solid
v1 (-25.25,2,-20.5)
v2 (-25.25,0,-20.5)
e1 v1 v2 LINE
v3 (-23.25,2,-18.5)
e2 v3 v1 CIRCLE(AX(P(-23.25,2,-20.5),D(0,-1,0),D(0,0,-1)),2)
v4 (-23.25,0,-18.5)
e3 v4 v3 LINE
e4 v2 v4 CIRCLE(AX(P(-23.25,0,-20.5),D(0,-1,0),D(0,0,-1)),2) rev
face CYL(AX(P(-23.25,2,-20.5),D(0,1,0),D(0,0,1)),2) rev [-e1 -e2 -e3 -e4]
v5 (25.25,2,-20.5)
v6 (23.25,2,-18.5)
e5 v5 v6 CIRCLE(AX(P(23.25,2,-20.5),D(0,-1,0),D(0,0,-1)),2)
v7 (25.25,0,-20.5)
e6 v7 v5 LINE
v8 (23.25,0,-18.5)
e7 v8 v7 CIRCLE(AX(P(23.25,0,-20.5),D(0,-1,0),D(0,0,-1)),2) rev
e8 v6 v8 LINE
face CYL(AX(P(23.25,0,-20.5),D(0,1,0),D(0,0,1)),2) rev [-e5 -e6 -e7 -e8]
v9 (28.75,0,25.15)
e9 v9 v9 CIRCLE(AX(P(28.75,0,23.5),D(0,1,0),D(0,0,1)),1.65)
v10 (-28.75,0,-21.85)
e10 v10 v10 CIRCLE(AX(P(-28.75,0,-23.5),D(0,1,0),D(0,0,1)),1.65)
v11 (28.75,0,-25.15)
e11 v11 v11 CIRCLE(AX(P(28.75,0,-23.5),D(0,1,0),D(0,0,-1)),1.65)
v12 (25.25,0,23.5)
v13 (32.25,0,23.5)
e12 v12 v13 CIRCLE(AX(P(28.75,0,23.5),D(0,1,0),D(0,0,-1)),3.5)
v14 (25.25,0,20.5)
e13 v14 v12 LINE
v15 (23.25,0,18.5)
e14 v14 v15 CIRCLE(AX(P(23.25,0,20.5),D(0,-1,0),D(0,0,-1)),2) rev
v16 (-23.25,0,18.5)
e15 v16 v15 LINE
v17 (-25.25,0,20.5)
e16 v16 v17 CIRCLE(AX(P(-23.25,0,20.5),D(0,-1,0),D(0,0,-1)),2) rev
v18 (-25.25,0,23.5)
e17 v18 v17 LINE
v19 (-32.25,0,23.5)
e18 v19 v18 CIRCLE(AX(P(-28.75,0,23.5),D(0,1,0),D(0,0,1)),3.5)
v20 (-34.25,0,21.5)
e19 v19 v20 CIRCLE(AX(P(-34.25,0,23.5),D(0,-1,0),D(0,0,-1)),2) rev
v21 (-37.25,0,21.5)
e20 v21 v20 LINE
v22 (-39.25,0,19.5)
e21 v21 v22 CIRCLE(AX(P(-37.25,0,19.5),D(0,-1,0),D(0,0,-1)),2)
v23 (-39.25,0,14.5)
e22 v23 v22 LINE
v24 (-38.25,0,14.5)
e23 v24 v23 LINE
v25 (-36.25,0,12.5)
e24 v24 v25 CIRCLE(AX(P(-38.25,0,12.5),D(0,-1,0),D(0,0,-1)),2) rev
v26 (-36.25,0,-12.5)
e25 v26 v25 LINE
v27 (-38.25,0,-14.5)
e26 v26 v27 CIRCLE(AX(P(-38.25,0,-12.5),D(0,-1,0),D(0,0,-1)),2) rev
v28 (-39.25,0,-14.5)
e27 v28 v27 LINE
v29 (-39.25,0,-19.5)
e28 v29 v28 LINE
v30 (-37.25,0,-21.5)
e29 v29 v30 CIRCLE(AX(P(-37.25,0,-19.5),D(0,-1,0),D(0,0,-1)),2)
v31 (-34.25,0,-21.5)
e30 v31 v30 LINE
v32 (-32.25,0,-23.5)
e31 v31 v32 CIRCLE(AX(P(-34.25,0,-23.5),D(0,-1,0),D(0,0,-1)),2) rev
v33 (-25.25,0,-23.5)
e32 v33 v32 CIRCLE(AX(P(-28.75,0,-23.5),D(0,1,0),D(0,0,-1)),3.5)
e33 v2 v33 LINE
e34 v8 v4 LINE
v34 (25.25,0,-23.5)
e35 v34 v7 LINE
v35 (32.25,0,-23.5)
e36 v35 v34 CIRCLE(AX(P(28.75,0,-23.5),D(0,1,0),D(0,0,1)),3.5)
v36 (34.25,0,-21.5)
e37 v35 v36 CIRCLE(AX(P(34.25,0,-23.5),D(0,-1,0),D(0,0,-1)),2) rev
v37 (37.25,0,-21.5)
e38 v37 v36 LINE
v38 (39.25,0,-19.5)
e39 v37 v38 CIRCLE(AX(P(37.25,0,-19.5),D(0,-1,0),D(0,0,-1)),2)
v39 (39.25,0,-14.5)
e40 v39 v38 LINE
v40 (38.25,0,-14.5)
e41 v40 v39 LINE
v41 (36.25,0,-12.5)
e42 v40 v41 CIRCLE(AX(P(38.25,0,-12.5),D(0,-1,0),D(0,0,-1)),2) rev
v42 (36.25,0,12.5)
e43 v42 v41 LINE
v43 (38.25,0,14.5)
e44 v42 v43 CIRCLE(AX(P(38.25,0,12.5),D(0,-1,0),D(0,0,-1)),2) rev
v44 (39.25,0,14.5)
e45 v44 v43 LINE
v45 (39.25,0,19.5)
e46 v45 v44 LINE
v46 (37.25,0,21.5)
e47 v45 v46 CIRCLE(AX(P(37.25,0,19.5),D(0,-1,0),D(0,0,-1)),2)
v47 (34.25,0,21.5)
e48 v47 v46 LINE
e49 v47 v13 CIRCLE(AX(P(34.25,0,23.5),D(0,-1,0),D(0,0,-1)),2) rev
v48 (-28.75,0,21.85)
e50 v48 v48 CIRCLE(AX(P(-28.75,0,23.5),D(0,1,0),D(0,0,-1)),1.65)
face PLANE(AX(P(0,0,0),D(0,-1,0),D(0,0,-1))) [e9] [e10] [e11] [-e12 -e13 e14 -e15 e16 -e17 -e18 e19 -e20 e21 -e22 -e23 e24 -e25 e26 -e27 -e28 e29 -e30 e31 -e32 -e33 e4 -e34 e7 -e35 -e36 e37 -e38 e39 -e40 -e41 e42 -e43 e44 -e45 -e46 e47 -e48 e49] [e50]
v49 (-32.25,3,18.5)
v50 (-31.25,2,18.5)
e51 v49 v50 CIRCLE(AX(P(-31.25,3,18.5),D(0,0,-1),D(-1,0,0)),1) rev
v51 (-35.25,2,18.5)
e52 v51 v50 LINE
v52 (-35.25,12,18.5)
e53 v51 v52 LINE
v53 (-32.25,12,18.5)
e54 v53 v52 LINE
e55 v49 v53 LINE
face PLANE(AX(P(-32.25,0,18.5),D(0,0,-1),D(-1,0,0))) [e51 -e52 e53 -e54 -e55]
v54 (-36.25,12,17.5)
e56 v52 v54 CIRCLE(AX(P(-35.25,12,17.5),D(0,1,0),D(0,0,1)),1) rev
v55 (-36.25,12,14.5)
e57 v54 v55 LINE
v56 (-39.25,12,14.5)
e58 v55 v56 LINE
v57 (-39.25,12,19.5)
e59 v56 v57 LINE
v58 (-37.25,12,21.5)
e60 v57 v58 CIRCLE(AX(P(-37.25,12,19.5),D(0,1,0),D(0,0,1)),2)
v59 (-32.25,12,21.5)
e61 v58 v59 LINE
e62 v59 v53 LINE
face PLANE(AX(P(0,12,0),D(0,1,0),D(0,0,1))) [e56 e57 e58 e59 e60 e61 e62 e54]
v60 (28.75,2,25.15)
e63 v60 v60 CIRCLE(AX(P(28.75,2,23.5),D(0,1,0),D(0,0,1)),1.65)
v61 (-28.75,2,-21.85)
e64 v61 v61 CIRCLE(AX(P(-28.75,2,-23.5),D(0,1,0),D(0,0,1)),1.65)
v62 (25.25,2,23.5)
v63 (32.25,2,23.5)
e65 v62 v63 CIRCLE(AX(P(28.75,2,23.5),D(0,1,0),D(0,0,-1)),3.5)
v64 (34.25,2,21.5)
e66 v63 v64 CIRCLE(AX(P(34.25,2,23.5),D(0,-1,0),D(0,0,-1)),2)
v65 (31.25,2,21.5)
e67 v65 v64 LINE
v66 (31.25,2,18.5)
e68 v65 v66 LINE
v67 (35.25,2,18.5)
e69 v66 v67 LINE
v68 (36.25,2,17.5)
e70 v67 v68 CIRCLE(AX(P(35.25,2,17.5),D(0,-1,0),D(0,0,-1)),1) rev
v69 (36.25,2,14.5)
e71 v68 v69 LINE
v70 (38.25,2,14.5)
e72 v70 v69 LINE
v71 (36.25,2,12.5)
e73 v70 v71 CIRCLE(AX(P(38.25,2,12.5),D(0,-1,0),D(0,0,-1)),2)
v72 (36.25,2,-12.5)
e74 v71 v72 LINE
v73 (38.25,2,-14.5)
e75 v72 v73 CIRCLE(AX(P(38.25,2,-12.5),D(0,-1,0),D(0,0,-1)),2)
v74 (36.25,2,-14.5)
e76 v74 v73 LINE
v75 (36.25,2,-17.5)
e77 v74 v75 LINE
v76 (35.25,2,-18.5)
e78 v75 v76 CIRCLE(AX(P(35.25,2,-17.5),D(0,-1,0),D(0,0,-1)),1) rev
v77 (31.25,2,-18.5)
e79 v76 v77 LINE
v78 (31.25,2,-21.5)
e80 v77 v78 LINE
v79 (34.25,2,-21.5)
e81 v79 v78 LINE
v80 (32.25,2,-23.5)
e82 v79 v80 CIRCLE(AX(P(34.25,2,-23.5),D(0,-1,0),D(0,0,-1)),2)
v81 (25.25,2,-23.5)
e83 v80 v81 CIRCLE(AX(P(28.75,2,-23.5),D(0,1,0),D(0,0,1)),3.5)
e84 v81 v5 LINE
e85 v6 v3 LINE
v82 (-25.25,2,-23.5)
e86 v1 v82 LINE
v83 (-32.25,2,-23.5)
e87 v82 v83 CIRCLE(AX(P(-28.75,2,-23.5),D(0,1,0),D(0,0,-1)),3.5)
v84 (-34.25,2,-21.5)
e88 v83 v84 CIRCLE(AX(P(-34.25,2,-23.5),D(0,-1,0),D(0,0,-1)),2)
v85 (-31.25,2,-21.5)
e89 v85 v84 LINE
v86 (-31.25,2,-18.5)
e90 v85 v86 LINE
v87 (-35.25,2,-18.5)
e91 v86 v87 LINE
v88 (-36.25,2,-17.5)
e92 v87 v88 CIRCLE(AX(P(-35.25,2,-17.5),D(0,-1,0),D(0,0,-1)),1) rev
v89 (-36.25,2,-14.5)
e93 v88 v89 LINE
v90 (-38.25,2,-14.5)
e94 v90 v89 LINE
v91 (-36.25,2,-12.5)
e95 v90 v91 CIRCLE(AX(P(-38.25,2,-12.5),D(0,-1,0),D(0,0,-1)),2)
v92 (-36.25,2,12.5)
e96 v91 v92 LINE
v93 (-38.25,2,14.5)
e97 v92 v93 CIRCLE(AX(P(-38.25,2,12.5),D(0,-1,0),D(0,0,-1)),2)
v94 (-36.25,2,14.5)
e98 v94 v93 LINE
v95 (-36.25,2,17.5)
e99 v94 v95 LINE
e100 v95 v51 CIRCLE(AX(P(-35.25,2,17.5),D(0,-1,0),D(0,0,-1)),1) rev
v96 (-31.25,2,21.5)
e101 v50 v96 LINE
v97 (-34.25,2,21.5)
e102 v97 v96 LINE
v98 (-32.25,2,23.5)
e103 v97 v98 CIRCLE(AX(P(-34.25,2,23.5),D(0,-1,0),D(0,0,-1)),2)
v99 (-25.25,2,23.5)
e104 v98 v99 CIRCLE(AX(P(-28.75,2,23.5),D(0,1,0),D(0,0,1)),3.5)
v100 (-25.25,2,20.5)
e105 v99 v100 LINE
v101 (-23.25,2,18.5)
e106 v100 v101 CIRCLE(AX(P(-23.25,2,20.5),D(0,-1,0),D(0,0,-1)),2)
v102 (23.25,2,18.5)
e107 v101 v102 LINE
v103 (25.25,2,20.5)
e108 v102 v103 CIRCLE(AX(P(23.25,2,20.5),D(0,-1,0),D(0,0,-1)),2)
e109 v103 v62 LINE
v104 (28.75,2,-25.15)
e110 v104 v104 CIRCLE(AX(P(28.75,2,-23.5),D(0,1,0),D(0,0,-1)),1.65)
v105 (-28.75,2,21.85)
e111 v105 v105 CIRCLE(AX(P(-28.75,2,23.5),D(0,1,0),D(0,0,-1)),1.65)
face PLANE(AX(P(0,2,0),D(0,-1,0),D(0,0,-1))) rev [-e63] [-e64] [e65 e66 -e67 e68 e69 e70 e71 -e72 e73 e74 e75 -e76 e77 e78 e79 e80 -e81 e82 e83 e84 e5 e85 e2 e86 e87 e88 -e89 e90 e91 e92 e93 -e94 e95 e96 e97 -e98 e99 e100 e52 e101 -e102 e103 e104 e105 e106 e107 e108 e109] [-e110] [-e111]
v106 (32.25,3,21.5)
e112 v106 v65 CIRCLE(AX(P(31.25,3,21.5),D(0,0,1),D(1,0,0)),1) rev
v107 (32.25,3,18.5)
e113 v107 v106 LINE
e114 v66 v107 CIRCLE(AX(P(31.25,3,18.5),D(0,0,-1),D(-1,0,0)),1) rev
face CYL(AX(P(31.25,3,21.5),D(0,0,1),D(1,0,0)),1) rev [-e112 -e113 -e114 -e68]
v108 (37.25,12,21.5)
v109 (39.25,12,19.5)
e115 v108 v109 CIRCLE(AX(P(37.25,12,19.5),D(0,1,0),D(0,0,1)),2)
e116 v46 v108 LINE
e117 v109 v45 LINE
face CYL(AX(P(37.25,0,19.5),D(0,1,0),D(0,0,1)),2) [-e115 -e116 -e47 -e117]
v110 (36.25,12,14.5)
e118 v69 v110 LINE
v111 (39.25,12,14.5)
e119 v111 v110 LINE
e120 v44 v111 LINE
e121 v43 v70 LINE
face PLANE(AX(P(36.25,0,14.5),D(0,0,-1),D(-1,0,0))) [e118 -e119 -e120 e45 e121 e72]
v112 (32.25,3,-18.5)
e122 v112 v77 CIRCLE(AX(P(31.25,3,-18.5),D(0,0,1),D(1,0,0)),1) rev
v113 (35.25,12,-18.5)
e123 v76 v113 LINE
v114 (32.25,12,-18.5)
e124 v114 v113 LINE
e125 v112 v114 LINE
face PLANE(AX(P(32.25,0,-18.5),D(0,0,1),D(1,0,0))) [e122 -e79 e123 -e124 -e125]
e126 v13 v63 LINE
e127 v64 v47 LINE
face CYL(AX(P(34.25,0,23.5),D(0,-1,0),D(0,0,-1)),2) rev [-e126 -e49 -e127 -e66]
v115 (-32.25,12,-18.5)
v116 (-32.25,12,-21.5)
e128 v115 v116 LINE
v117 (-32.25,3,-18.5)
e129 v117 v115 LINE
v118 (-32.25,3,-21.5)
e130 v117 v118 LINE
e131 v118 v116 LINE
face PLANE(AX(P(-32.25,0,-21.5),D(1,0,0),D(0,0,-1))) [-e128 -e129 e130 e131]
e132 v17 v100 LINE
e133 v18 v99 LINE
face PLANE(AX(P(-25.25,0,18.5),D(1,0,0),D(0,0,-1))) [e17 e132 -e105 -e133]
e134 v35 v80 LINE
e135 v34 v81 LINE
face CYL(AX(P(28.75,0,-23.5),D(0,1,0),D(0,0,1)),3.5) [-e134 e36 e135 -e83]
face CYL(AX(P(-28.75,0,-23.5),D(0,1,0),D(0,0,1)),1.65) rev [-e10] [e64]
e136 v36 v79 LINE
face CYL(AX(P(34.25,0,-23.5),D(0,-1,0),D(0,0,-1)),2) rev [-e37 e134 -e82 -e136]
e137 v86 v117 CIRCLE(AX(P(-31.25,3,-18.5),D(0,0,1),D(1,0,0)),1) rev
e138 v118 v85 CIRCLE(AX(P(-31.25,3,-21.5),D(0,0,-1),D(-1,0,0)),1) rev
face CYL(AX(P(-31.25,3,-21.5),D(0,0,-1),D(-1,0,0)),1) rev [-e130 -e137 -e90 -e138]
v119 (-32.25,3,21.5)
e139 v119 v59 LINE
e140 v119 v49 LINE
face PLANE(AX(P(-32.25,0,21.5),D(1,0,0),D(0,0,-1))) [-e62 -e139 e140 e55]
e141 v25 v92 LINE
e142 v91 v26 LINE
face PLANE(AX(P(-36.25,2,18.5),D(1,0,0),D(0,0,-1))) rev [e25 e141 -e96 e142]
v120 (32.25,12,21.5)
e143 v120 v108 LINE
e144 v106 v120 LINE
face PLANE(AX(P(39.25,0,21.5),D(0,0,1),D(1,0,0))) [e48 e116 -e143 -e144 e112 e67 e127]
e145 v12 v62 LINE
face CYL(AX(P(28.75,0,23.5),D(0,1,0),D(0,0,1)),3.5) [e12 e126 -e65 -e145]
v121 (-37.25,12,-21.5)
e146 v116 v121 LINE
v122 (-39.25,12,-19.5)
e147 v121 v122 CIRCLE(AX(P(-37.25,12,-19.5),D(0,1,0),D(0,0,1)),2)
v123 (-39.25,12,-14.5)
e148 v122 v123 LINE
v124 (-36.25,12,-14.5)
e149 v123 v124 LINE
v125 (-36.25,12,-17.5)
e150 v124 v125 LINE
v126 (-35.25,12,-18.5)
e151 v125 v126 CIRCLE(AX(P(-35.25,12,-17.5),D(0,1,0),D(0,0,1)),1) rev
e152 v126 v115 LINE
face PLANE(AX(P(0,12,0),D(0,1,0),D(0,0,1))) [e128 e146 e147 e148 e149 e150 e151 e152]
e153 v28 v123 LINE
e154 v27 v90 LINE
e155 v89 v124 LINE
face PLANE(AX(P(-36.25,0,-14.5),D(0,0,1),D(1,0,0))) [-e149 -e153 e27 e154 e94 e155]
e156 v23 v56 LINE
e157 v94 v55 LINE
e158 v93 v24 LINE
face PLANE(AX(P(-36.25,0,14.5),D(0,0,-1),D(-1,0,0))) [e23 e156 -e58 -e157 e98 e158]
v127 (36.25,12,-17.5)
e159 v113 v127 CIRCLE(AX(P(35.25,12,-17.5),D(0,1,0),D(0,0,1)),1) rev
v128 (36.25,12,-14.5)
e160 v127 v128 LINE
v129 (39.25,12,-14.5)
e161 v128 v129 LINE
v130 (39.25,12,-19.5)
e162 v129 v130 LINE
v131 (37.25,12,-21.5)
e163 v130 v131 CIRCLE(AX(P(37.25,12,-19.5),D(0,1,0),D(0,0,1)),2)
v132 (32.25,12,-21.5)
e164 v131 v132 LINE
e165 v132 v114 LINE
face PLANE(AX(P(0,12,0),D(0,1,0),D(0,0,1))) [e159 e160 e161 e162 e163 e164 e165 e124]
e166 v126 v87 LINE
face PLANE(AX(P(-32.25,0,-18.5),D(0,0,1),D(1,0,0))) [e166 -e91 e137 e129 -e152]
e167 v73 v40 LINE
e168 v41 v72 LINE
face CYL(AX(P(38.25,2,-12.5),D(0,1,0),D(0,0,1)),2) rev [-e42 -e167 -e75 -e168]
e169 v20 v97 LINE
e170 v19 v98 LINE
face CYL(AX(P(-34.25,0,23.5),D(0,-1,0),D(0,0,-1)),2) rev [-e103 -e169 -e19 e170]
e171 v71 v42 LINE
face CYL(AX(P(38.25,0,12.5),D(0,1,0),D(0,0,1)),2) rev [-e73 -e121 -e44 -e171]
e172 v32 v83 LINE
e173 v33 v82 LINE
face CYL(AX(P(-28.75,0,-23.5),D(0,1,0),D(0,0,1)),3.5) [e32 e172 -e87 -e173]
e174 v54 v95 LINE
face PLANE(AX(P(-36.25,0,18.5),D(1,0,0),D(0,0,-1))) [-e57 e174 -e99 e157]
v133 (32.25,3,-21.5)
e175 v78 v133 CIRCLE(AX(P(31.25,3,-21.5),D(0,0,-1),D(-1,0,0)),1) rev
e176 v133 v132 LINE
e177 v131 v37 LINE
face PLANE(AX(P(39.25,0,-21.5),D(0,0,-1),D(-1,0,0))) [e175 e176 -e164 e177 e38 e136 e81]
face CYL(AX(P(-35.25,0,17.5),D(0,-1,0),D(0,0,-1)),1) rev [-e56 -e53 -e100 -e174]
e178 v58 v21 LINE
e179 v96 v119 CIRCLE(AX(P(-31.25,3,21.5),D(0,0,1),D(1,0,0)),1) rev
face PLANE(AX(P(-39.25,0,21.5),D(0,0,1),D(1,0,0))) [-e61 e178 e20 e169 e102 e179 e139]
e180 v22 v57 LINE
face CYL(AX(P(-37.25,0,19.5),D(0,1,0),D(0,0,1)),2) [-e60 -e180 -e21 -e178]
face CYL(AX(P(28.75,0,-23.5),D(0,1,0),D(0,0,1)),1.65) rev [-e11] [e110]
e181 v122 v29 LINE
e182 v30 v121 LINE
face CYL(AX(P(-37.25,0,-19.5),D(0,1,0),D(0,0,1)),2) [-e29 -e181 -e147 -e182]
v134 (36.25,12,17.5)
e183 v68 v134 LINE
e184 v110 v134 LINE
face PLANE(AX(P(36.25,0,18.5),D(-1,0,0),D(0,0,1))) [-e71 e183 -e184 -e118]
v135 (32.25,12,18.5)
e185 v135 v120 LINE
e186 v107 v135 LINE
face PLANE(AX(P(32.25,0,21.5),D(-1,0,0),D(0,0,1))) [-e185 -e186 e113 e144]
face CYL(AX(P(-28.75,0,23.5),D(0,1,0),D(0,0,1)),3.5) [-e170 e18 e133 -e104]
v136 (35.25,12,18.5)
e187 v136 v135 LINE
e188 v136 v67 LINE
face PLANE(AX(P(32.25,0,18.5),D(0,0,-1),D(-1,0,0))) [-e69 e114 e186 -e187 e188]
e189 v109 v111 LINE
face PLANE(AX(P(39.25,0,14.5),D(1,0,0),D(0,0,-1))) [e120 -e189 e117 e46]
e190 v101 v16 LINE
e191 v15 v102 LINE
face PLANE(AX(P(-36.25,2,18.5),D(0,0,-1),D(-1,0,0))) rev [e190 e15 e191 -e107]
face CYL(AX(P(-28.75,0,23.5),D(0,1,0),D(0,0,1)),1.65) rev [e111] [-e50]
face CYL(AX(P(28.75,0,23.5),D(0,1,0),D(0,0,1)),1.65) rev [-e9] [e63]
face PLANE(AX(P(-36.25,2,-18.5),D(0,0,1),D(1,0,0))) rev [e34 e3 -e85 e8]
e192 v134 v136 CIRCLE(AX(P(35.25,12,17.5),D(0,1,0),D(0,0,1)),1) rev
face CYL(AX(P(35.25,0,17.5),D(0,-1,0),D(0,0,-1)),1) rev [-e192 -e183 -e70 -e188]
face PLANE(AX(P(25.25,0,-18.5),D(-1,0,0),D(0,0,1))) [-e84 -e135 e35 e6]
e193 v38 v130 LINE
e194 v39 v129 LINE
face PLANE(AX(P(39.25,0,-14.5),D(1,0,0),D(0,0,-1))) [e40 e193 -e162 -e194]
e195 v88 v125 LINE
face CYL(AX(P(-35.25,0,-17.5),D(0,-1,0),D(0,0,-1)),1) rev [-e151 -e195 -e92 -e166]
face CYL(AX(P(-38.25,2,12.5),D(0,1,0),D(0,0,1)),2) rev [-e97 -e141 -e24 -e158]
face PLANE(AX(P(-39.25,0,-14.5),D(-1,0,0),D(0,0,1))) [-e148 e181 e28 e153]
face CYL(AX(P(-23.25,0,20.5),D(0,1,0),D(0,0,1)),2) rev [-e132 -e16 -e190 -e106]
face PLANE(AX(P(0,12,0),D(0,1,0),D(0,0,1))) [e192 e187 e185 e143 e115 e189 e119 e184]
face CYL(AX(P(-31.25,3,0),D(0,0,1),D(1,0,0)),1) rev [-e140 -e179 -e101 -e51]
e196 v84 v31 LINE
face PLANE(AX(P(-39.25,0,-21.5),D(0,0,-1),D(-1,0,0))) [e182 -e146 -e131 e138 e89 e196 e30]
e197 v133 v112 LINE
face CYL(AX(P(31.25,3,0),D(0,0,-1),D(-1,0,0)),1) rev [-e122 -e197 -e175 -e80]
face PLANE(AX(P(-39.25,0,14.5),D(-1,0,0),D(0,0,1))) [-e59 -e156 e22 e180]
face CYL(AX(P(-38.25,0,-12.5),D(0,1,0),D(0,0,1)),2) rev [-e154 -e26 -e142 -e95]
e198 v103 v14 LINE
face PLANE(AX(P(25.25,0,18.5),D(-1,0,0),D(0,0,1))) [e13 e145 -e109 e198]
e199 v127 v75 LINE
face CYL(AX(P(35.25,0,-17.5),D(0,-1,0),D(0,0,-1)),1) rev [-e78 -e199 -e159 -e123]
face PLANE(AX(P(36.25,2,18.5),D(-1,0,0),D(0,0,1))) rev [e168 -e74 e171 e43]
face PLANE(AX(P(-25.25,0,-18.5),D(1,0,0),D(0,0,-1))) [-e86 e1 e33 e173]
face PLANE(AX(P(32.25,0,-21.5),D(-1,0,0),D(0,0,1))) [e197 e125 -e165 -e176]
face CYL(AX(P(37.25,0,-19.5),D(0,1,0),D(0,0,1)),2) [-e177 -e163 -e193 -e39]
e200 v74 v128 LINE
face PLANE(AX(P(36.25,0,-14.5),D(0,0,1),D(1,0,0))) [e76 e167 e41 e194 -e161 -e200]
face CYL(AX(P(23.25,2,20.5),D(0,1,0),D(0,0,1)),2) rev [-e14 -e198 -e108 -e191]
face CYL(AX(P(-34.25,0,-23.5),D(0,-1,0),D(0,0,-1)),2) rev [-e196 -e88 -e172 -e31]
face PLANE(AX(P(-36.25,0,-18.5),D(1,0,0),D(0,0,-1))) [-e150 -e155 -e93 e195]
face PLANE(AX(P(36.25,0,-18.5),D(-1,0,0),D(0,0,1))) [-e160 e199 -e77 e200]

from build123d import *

# Parameters (mm, degrees)
SKETCH_1_W           = 72.5
SKETCH_1_H           = 37
EXTRUDE_1_DEPTH      = 2
EXTRUDE_2_DEPTH      = 10
EXTRUDE_2_DEPTH_BACK = 2
SKETCH_3_R           = 1.65
EXTRUDE_3_DEPTH      = 2
FILLET_1_R           = 2
FILLET_2_R           = 1


with BuildPart() as part:
    # 草图1 → 凸台-拉伸1 (new body)
    with BuildSketch(Plane(origin=(0, 0, 0), x_dir=(1, 0, 0), z_dir=(0, 1, 0))):
        Rectangle(SKETCH_1_W, SKETCH_1_H)
    extrude(amount=EXTRUDE_1_DEPTH)

    # 草图2 → 凸台-拉伸2 (add, two sides: drawn at the far end of the back side and taken through both)
    with BuildSketch(Plane(origin=(0, 2, 0), x_dir=(1, 0, 0), z_dir=(0, 1, 0)).offset(-EXTRUDE_2_DEPTH_BACK)):
        Polygon((-36.25, 18.5), (-36.25, 14.5), (-39.25, 14.5), (-39.25, 21.5), (-32.25, 21.5), (-32.25, 18.5), align=None)
        Polygon((32.25, 18.5), (36.25, 18.5), (36.25, 14.5), (39.25, 14.5), (39.25, 21.5), (32.25, 21.5), align=None)
        Polygon((36.25, -18.5), (36.25, -14.5), (39.25, -14.5), (39.25, -21.5), (32.25, -21.5), (32.25, -18.5), align=None)
        Polygon((-32.25, -18.5), (-36.25, -18.5), (-36.25, -14.5), (-39.25, -14.5), (-39.25, -21.5), (-32.25, -21.5), align=None)
    extrude(amount=EXTRUDE_2_DEPTH + EXTRUDE_2_DEPTH_BACK)

    # 草图3 → 凸台-拉伸3 (add)
    # profile 1 of 4: a face of its own
    with BuildSketch(Plane(origin=(0, 2, 0), x_dir=(1, 0, 0), z_dir=(0, 1, 0))):
        with BuildLine():
            Line((25.25, 18.5), (25.25, 23.5))
            ThreePointArc((25.25, 23.5), (28.75, 27), (32.25, 23.5))
            Line((32.25, 23.5), (32.25, 18.5))
            Line((32.25, 18.5), (25.25, 18.5))
        make_face()
        with Locations(Location((28.75, 23.5, 0), (0, 0, 90))):
            Circle(SKETCH_3_R, mode=Mode.SUBTRACT)
    # profile 2 of 4: a face of its own
    with BuildSketch(Plane(origin=(0, 2, 0), x_dir=(1, 0, 0), z_dir=(0, 1, 0))):
        with BuildLine():
            Line((-32.25, 18.5), (-25.25, 18.5))
            Line((-25.25, 18.5), (-25.25, 23.5))
            ThreePointArc((-25.25, 23.5), (-28.75, 27), (-32.25, 23.5))
            Line((-32.25, 23.5), (-32.25, 18.5))
        make_face()
        with Locations(Location((-28.75, 23.5, 0), (0, 0, 270))):
            Circle(SKETCH_3_R, mode=Mode.SUBTRACT)
    # profile 3 of 4: a face of its own
    with BuildSketch(Plane(origin=(0, 2, 0), x_dir=(1, 0, 0), z_dir=(0, 1, 0))):
        with BuildLine():
            Line((32.25, -18.5), (25.25, -18.5))
            Line((25.25, -18.5), (25.25, -23.5))
            ThreePointArc((25.25, -23.5), (28.75, -27), (32.25, -23.5))
            Line((32.25, -23.5), (32.25, -18.5))
        make_face()
        with Locations(Location((28.75, -23.5, 0), (0, 0, 270))):
            Circle(SKETCH_3_R, mode=Mode.SUBTRACT)
    # profile 4 of 4: a face of its own
    with BuildSketch(Plane(origin=(0, 2, 0), x_dir=(1, 0, 0), z_dir=(0, 1, 0))):
        with BuildLine():
            Line((-25.25, -18.5), (-25.25, -23.5))
            ThreePointArc((-25.25, -23.5), (-28.75, -27), (-32.25, -23.5))
            Line((-32.25, -23.5), (-32.25, -18.5))
            Line((-32.25, -18.5), (-25.25, -18.5))
        make_face()
        with Locations(Location((-28.75, -23.5, 0), (0, 0, 90))):
            Circle(SKETCH_3_R, mode=Mode.SUBTRACT)
    extrude(amount=-EXTRUDE_3_DEPTH)

    # 圆角1
    fillet_1_edges = [part.edges().sort_by_distance(p)[0] for p in [
        (-25.25, 1, 18.5),
        (-36.25, 1, 14.5),
        (-36.25, 1, -14.5),
        (-25.25, 1, -18.5),
        (25.25, 1, -18.5),
        (36.25, 1, -14.5),
        (36.25, 1, 14.5),
        (-39.25, 6, 21.5),
        (39.25, 6, 21.5),
        (39.25, 6, -21.5),
        (-39.25, 6, -21.5),
        (-32.25, 1, -21.5),
        (32.25, 1, -21.5),
        (25.25, 1, 18.5),
        (32.25, 1, 21.5),
        (-32.25, 1, 21.5),
    ]]
    fillet(fillet_1_edges, radius=FILLET_1_R - 0.0001)  # a hair under: the kernel refuses the full size

    # 圆角2
    fillet_2_edges = [part.edges().sort_by_distance(p)[0] for p in [
        (-32.25, 2, 20),
        (32.25, 2, -20),
        (-36.25, 7, 18.5),
        (36.25, 7, 18.5),
        (36.25, 7, -18.5),
        (-36.25, 7, -18.5),
        (32.25, 2, 20),
        (-32.25, 2, -20),
    ]]
    fillet(fillet_2_edges, radius=FILLET_2_R)


solid = part.part
